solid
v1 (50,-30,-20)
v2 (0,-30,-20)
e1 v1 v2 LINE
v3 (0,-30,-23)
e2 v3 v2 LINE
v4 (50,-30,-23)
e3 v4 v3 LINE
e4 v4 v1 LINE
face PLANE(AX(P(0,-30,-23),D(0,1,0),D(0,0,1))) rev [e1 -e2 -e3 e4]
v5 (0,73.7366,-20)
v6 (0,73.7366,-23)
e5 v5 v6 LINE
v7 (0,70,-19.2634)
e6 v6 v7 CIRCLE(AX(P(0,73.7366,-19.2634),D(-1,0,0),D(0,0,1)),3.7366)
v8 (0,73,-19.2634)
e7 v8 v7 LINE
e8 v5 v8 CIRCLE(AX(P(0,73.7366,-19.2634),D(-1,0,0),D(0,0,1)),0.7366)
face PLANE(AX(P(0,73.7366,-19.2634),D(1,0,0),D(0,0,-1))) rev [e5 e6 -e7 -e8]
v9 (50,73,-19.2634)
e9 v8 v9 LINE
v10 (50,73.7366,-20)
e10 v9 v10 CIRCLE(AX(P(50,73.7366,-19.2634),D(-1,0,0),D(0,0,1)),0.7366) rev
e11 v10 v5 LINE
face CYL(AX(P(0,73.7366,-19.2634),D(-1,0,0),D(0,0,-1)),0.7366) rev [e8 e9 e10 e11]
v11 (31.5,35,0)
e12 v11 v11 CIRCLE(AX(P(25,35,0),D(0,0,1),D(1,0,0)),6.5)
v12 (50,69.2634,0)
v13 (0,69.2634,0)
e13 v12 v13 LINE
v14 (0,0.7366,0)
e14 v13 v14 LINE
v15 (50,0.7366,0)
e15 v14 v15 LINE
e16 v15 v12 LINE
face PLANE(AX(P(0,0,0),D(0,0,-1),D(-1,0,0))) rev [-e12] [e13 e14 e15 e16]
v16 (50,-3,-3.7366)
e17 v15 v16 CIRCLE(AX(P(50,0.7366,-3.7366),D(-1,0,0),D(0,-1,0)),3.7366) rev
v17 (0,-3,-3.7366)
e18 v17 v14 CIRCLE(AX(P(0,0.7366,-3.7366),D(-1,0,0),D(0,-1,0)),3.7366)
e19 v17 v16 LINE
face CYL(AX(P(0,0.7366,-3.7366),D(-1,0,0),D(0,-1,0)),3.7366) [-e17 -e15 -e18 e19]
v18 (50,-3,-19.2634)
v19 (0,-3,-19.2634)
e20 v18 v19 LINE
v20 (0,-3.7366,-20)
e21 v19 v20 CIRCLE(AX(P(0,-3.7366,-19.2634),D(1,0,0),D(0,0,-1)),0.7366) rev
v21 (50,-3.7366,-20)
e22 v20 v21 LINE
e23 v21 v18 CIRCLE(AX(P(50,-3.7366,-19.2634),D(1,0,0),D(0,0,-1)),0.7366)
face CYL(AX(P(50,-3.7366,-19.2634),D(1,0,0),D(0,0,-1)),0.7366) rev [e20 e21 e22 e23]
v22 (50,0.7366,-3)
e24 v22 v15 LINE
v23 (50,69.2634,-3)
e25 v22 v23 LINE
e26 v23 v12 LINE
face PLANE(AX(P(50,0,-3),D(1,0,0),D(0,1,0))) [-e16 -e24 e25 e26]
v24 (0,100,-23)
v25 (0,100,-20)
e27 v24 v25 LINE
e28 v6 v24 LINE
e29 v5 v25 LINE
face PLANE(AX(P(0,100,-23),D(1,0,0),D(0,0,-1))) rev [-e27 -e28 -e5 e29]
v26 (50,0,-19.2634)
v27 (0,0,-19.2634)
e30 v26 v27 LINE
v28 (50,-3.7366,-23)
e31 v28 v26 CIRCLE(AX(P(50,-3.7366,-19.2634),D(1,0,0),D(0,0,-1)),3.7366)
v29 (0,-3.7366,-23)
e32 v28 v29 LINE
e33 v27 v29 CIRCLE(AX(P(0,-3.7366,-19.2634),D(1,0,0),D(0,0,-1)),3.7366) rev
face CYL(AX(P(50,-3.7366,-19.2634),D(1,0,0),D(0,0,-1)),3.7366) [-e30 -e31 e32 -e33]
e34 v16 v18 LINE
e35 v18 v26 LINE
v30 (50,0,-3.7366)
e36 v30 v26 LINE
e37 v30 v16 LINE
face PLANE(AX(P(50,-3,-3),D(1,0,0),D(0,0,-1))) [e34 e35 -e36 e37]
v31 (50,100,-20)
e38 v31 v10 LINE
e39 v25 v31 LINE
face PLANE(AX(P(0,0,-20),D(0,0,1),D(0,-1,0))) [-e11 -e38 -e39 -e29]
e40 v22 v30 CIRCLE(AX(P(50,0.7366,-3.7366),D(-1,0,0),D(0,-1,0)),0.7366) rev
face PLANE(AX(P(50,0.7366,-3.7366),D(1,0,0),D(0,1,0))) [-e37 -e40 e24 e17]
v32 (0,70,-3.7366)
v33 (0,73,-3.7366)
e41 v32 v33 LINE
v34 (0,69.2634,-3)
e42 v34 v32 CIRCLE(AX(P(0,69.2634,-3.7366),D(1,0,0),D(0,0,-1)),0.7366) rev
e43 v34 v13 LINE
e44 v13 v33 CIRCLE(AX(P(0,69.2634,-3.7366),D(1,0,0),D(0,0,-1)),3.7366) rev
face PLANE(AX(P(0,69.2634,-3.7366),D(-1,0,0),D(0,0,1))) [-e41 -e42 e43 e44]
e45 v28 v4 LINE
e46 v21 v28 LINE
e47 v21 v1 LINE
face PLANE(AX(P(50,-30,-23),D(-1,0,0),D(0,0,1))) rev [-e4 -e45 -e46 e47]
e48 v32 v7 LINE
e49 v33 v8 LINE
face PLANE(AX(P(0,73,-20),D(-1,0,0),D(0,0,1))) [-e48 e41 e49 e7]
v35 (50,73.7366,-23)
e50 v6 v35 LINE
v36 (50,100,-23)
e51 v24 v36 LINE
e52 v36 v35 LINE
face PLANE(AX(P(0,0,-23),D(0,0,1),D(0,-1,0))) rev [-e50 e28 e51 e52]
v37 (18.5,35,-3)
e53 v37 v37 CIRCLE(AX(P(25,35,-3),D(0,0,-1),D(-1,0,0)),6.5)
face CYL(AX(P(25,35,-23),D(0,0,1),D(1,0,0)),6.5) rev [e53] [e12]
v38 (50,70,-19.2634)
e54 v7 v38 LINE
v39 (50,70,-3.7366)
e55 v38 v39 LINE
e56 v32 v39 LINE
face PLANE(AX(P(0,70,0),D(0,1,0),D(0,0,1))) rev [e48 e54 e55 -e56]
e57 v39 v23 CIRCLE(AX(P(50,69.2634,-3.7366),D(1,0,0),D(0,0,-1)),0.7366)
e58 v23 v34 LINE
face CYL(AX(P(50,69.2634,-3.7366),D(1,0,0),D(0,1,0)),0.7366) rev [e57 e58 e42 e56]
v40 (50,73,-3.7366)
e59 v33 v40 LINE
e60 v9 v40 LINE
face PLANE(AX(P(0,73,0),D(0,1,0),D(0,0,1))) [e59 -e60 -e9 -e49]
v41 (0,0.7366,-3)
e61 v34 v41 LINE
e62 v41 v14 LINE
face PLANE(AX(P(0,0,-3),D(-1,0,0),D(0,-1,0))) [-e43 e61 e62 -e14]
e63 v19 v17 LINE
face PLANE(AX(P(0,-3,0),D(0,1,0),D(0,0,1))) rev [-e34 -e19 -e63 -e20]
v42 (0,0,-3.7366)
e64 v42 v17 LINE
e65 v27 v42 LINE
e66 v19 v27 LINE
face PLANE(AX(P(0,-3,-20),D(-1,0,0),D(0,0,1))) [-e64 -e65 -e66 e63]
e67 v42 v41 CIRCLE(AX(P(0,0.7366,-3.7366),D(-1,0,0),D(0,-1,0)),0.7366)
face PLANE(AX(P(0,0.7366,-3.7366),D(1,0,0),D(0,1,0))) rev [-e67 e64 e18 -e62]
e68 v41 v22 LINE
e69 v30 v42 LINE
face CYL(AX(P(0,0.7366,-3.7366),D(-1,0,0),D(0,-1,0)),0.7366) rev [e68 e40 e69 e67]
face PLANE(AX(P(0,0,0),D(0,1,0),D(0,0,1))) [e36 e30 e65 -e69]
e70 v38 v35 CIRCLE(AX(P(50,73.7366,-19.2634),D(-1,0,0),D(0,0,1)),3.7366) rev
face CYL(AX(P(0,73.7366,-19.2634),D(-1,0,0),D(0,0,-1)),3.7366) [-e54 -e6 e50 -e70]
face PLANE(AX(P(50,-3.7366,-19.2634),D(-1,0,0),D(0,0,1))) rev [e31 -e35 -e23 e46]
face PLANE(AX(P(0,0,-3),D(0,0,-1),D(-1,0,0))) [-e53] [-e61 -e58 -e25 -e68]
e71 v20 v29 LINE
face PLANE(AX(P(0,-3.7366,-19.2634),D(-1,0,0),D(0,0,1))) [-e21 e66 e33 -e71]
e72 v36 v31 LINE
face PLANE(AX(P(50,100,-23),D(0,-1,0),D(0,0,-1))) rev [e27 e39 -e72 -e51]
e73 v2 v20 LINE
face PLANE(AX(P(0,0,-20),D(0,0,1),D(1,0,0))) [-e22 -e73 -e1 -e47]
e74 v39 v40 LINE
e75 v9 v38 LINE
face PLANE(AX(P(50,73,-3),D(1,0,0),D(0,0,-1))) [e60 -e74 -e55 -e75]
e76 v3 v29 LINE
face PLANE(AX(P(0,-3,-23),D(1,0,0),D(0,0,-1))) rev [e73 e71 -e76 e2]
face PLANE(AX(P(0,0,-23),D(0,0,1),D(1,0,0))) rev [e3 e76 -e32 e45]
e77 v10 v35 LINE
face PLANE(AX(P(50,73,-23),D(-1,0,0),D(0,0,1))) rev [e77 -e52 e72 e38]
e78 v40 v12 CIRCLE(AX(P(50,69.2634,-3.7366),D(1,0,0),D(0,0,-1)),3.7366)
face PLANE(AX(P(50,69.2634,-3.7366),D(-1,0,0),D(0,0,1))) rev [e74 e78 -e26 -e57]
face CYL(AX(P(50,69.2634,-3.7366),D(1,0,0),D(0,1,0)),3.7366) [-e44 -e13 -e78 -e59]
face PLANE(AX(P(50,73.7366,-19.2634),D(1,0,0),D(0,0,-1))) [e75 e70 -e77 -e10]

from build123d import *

# Parameters (mm, degrees)
SKETCH_1_W                         = 50
SKETCH_1_H                         = 70
SM_BASE_FLANGE_1_DEPTH             = 3
SM_EDGE_FLANGE_1_STRIP_W           = 13.4732
SM_EDGE_FLANGE_1_STRIP_H           = 3
SM_EDGE_FLANGE_1_STRIP_CUT_DEPTH   = 50
SM_EDGE_FLANGE_1_STRIP_2_W         = 13.4732
SM_EDGE_FLANGE_1_STRIP_2_H         = 3
SM_EDGE_FLANGE_1_STRIP_CUT_2_DEPTH = 50
SM_EDGE_FLANGE_1_DEPTH             = 50
SM_EDGE_FLANGE_1_BEND_DEPTH        = 50
SM_EDGE_FLANGE_2_STRIP_W           = 13.4732
SM_EDGE_FLANGE_2_STRIP_H           = 3
SM_EDGE_FLANGE_2_STRIP_CUT_DEPTH   = 50
SM_EDGE_FLANGE_2_STRIP_2_W         = 13.4732
SM_EDGE_FLANGE_2_STRIP_2_H         = 3
SM_EDGE_FLANGE_2_STRIP_CUT_2_DEPTH = 50
SM_EDGE_FLANGE_2_DEPTH             = 50
SM_EDGE_FLANGE_2_BEND_DEPTH        = 50
SKETCH_18_R                        = 6.5
CUT_EXTRUDE_1_DEPTH                = 115.144645078


# Sheet-metal steps are written as plain solids
with BuildPart() as part:
    # Sketch 1 → 基体-法兰1 (new body)
    with BuildSketch(Plane.XY):
        with Locations((25, 35)):
            Rectangle(SKETCH_1_W, SKETCH_1_H)
    extrude(amount=-SM_BASE_FLANGE_1_DEPTH)

    # 边线-法兰1 strip (across the edge) → 边线-法兰1 strip cut (cut)
    with BuildSketch(Plane(origin=(0, 70, -3), x_dir=(0, -1, 0), z_dir=(1, 0, 0))):
        with Locations((-6, -1.5)):
            Rectangle(SM_EDGE_FLANGE_1_STRIP_W, SM_EDGE_FLANGE_1_STRIP_H)
    extrude(amount=SM_EDGE_FLANGE_1_STRIP_CUT_DEPTH, mode=Mode.SUBTRACT)

    # 边线-法兰1 strip 2 (across the edge) → 边线-法兰1 strip cut 2 (cut)
    with BuildSketch(Plane(origin=(50, 0, -3), x_dir=(0, 1, 0), z_dir=(-1, 0, 0))):
        with Locations((-6, -1.5)):
            Rectangle(SM_EDGE_FLANGE_1_STRIP_2_W, SM_EDGE_FLANGE_1_STRIP_2_H)
    extrude(amount=SM_EDGE_FLANGE_1_STRIP_CUT_2_DEPTH, mode=Mode.SUBTRACT)

    # 边线-法兰1 section (across the edge) → 边线-法兰1 (add)
    with BuildSketch(Plane(origin=(0, 70, -3), x_dir=(0, -1, 0), z_dir=(1, 0, 0))):
        with BuildLine():
            Line((-3, 0.7366), (-3, 17))
            Line((-3, 17), (0, 17))
            Line((0, 17), (0, 0.7366))
            ThreePointArc((0, 0.7366), (0.215745145, 0.215745145), (0.7366, 0))
            Line((0.7366, 0), (0.7366, -3))
            ThreePointArc((0.7366, -3), (-1.905575199, -1.905575199), (-3, 0.7366))
        make_face()
    extrude(amount=SM_EDGE_FLANGE_1_DEPTH)

    # 边线-法兰1 section 2 (across the edge) → 边线-法兰1 bend (add)
    with BuildSketch(Plane(origin=(50, 0, -3), x_dir=(0, 1, 0), z_dir=(-1, 0, 0))):
        with BuildLine():
            Line((-3, 0.7366), (-3, 17))
            Line((-3, 17), (0, 17))
            Line((0, 17), (0, 0.7366))
            ThreePointArc((0, 0.7366), (0.215745145, 0.215745145), (0.7366, 0))
            Line((0.7366, 0), (0.7366, -3))
            ThreePointArc((0.7366, -3), (-1.905575199, -1.905575199), (-3, 0.7366))
        make_face()
    extrude(amount=SM_EDGE_FLANGE_1_BEND_DEPTH)

    # 边线-法兰2 strip (across the edge) → 边线-法兰2 strip cut (cut)
    with BuildSketch(Plane(origin=(0, -3, -20), x_dir=(0, 0, 1), z_dir=(1, 0, 0))):
        with Locations((-6, -1.5)):
            Rectangle(SM_EDGE_FLANGE_2_STRIP_W, SM_EDGE_FLANGE_2_STRIP_H)
    extrude(amount=SM_EDGE_FLANGE_2_STRIP_CUT_DEPTH, mode=Mode.SUBTRACT)

    # 边线-法兰2 strip 2 (across the edge) → 边线-法兰2 strip cut 2 (cut)
    with BuildSketch(Plane(origin=(50, 73, -20), x_dir=(0, 0, 1), z_dir=(-1, 0, 0))):
        with Locations((-6, -1.5)):
            Rectangle(SM_EDGE_FLANGE_2_STRIP_2_W, SM_EDGE_FLANGE_2_STRIP_2_H)
    extrude(amount=SM_EDGE_FLANGE_2_STRIP_CUT_2_DEPTH, mode=Mode.SUBTRACT)

    # 边线-法兰2 section (across the edge) → 边线-法兰2 (add)
    with BuildSketch(Plane(origin=(0, -3, -20), x_dir=(0, 0, 1), z_dir=(1, 0, 0))):
        with BuildLine():
            Line((-3, 0.7366), (-3, 27))
            Line((-3, 27), (0, 27))
            Line((0, 27), (0, 0.7366))
            ThreePointArc((0, 0.7366), (0.215745145, 0.215745145), (0.7366, 0))
            Line((0.7366, 0), (0.7366, -3))
            ThreePointArc((0.7366, -3), (-1.905575199, -1.905575199), (-3, 0.7366))
        make_face()
    extrude(amount=SM_EDGE_FLANGE_2_DEPTH)

    # 边线-法兰2 section 2 (across the edge) → 边线-法兰2 bend (add)
    with BuildSketch(Plane(origin=(50, 73, -20), x_dir=(0, 0, 1), z_dir=(-1, 0, 0))):
        with BuildLine():
            Line((-3, 0.7366), (-3, 27))
            Line((-3, 27), (0, 27))
            Line((0, 27), (0, 0.7366))
            ThreePointArc((0, 0.7366), (0.215745145, 0.215745145), (0.7366, 0))
            Line((0.7366, 0), (0.7366, -3))
            ThreePointArc((0.7366, -3), (-1.905575199, -1.905575199), (-3, 0.7366))
        make_face()
    extrude(amount=SM_EDGE_FLANGE_2_BEND_DEPTH)

    # 草图18 → 切除-拉伸1 (cut, through all)
    with BuildSketch(Plane.XY):
        with Locations((25, 35)):
            Circle(SKETCH_18_R)
    extrude(amount=-CUT_EXTRUDE_1_DEPTH, mode=Mode.SUBTRACT)


solid = part.part
